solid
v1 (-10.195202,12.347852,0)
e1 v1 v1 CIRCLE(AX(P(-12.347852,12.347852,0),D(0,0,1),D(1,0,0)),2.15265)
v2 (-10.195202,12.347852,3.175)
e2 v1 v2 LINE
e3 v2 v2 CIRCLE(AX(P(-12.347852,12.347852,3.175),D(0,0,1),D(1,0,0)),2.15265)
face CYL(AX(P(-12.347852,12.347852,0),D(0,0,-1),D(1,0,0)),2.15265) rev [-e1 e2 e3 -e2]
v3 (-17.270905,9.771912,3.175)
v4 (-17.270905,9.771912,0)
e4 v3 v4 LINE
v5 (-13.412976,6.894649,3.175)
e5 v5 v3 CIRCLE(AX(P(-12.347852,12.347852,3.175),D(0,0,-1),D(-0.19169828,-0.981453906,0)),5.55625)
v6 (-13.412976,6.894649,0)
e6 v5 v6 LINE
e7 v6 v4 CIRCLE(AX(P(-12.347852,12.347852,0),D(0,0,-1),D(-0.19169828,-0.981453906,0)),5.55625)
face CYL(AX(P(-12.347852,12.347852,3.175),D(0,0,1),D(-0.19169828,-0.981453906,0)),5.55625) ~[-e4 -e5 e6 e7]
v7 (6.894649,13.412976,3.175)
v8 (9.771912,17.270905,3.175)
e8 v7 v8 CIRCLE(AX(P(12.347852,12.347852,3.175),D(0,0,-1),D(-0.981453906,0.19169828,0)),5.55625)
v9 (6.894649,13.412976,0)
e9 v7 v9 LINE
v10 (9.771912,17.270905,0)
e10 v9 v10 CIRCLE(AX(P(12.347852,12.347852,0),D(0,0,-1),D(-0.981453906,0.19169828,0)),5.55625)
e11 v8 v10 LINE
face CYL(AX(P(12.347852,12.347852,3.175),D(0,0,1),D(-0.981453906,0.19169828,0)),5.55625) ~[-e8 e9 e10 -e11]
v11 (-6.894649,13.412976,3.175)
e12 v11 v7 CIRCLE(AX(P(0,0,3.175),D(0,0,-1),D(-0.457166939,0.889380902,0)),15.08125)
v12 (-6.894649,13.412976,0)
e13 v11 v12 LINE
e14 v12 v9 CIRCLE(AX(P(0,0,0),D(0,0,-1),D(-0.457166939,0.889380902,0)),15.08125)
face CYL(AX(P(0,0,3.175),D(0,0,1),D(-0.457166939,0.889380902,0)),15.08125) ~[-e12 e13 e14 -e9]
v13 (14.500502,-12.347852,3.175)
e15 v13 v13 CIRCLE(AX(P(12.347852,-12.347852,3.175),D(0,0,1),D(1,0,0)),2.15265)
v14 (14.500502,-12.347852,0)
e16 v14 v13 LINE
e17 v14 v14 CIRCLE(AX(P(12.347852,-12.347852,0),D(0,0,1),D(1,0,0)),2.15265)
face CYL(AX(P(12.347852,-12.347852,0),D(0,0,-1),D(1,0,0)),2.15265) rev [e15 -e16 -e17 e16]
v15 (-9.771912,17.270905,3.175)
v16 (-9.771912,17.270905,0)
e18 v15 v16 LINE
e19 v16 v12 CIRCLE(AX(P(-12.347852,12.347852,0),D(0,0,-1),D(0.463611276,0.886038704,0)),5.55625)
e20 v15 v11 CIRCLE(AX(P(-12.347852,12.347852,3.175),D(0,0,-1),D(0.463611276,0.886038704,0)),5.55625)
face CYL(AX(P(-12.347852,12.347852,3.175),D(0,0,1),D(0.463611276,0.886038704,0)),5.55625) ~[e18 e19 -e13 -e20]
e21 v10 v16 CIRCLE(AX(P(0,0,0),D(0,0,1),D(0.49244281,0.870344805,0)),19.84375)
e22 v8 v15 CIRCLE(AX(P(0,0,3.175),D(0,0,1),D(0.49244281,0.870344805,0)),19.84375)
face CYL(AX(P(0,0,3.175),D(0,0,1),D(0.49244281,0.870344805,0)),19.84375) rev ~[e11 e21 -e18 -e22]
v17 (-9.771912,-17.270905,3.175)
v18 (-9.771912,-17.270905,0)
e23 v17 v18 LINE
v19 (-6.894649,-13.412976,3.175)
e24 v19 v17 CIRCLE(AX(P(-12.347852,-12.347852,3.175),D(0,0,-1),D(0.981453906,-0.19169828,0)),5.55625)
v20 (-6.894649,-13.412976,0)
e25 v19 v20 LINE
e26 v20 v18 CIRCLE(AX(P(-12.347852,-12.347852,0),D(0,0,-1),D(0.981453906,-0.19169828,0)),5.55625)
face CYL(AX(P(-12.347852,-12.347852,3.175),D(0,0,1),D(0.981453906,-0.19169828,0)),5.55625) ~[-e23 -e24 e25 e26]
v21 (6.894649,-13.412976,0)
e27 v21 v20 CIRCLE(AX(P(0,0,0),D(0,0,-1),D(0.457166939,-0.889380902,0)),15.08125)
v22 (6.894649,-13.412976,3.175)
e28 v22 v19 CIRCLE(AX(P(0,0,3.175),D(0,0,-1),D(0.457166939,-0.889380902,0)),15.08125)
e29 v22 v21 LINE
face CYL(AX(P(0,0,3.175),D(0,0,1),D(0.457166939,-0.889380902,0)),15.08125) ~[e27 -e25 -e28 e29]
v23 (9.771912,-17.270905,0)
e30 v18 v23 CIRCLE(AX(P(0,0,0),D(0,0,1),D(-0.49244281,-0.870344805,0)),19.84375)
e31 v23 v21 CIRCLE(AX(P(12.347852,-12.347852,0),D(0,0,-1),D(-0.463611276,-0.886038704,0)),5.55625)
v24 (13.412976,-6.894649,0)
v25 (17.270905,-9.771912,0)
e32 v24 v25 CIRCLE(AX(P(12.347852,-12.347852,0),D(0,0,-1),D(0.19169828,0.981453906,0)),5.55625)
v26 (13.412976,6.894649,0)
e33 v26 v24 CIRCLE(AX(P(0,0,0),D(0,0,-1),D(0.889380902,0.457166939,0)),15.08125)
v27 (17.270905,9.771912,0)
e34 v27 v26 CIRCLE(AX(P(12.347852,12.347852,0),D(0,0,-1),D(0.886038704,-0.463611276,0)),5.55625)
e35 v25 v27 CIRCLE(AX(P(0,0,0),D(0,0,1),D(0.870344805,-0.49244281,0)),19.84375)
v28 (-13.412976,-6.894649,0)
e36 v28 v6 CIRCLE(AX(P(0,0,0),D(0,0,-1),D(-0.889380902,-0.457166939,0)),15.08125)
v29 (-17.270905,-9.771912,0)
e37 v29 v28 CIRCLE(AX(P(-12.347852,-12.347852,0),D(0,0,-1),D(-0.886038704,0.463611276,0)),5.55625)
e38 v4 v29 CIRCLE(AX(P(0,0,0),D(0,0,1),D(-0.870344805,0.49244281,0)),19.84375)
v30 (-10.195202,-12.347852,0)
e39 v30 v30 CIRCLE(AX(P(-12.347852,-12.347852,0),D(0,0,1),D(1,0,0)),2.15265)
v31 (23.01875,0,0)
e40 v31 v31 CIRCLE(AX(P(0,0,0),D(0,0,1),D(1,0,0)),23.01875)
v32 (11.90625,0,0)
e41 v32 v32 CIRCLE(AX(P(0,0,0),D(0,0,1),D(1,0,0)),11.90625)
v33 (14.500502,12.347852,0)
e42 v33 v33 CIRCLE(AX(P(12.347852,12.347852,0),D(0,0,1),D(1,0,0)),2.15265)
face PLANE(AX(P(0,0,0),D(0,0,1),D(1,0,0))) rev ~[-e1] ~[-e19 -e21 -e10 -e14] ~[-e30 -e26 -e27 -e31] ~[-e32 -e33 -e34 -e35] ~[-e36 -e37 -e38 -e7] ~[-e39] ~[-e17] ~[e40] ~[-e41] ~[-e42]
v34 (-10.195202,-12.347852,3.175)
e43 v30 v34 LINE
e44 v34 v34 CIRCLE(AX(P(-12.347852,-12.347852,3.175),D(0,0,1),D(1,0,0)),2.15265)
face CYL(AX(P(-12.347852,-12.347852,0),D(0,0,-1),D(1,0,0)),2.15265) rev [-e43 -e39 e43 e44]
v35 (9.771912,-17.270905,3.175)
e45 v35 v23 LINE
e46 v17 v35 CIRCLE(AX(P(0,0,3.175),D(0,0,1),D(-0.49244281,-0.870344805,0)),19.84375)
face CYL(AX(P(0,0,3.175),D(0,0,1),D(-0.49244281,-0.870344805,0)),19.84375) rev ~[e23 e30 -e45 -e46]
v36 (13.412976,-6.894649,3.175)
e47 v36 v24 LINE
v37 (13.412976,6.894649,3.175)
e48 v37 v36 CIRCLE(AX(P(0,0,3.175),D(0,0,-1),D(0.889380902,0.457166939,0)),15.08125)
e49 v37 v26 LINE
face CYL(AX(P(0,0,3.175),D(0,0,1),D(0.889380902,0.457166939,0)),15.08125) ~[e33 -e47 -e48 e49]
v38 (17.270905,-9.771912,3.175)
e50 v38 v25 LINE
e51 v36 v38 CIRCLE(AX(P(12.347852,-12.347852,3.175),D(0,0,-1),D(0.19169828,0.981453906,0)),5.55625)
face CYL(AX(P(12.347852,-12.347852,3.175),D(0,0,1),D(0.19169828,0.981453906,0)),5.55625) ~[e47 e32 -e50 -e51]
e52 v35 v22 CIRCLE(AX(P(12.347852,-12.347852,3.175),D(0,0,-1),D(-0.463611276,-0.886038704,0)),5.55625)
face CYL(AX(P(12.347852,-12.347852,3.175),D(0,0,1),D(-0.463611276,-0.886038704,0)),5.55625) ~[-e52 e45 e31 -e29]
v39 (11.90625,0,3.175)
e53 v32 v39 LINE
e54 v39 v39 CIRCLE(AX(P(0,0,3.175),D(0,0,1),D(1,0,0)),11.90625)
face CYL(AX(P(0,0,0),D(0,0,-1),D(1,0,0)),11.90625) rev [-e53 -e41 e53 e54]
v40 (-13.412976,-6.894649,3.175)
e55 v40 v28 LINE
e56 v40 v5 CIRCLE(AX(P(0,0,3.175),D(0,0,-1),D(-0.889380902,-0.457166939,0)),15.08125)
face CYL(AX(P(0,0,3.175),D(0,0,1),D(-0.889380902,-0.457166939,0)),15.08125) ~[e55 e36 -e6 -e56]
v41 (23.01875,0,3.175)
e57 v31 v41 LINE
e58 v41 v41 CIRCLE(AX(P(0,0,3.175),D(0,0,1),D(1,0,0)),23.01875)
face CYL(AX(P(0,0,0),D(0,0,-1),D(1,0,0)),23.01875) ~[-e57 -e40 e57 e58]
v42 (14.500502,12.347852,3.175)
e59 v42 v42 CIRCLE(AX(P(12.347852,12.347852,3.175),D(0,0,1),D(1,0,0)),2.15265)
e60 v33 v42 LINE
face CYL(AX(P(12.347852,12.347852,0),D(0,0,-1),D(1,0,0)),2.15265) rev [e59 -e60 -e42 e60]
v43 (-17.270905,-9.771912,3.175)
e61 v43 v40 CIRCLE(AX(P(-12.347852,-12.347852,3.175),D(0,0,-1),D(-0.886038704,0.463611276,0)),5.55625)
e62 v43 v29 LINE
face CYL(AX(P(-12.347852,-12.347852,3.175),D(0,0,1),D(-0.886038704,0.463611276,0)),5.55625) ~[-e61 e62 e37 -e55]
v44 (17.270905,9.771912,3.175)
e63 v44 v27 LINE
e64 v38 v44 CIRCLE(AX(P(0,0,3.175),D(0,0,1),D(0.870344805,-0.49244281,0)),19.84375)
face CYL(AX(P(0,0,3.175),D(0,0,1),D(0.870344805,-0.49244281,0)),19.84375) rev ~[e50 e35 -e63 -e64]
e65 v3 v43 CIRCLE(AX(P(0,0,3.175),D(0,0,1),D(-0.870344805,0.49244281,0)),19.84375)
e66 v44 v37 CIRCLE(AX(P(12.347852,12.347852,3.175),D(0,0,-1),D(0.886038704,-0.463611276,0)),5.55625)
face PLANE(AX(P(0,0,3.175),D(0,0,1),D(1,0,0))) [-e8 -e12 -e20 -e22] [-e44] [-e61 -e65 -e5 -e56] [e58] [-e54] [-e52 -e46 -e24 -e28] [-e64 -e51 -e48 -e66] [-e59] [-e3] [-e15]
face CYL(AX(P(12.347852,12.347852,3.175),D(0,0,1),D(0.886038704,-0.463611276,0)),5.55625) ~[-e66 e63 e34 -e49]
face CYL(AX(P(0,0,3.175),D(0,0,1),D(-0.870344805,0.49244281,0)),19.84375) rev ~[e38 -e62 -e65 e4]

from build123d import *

# Parameters (mm, degrees)
F0_R            = 23.01875
F0_R_2          = 2.15265
F0_R_3          = 11.90625
F1_DEPTH        = 3.175
F3_DEPTH        = 3.175
F3_COPIES_COUNT = 4


# Not quite as in the source:
# - a pattern or mirror of a feature is missing from the dataset's text; its kind, count and spacing are read off the source's solid


with BuildPart() as f1:
    # F0 (on Top) → F1 (new body)
    with BuildSketch(Plane.XY):
        Circle(F0_R)
        with Locations((-12.3478521665, -12.3478521665)):
            Circle(F0_R_2, mode=Mode.SUBTRACT)
        with Locations((12.3478521665, -12.3478521665)):
            Circle(F0_R_2, mode=Mode.SUBTRACT)
        with Locations((-12.3478521665, 12.3478521665)):
            Circle(F0_R_2, mode=Mode.SUBTRACT)
        Circle(F0_R_3, mode=Mode.SUBTRACT)
        with Locations((12.3478521665, 12.3478521665)):
            Circle(F0_R_2, mode=Mode.SUBTRACT)
    extrude(amount=F1_DEPTH)

    # F2 (on face) → F3 (cut, through all)
    with BuildSketch(Plane.XY.offset(3.175)):
        with BuildLine():
            ThreePointArc((-9.7719120136, 17.2709047146), (-7.8938999882, 15.6696324205), (-6.8946489019, 13.4129757356))
            ThreePointArc((-6.8946489019, 13.4129757356), (0, 15.08125), (6.8946489019, 13.4129757356))
            ThreePointArc((6.8946489019, 13.4129757356), (7.8938999882, 15.6696324205), (9.7719120136, 17.2709047146))
            ThreePointArc((9.7719120136, 17.2709047146), (0, 19.84375), (-9.7719120136, 17.2709047146))
        make_face()
    f3 = extrude(amount=-F3_DEPTH, mode=Mode.SUBTRACT)

    # F3_copies: F3 ×4 about axis
    f3_copies_axis = Axis((0, 0, 0), (0, 0, 1))
    for i in range(1, F3_COPIES_COUNT):
        add(f3.rotate(f3_copies_axis, i * 360 / F3_COPIES_COUNT), mode=Mode.SUBTRACT)


solid = f1.part
